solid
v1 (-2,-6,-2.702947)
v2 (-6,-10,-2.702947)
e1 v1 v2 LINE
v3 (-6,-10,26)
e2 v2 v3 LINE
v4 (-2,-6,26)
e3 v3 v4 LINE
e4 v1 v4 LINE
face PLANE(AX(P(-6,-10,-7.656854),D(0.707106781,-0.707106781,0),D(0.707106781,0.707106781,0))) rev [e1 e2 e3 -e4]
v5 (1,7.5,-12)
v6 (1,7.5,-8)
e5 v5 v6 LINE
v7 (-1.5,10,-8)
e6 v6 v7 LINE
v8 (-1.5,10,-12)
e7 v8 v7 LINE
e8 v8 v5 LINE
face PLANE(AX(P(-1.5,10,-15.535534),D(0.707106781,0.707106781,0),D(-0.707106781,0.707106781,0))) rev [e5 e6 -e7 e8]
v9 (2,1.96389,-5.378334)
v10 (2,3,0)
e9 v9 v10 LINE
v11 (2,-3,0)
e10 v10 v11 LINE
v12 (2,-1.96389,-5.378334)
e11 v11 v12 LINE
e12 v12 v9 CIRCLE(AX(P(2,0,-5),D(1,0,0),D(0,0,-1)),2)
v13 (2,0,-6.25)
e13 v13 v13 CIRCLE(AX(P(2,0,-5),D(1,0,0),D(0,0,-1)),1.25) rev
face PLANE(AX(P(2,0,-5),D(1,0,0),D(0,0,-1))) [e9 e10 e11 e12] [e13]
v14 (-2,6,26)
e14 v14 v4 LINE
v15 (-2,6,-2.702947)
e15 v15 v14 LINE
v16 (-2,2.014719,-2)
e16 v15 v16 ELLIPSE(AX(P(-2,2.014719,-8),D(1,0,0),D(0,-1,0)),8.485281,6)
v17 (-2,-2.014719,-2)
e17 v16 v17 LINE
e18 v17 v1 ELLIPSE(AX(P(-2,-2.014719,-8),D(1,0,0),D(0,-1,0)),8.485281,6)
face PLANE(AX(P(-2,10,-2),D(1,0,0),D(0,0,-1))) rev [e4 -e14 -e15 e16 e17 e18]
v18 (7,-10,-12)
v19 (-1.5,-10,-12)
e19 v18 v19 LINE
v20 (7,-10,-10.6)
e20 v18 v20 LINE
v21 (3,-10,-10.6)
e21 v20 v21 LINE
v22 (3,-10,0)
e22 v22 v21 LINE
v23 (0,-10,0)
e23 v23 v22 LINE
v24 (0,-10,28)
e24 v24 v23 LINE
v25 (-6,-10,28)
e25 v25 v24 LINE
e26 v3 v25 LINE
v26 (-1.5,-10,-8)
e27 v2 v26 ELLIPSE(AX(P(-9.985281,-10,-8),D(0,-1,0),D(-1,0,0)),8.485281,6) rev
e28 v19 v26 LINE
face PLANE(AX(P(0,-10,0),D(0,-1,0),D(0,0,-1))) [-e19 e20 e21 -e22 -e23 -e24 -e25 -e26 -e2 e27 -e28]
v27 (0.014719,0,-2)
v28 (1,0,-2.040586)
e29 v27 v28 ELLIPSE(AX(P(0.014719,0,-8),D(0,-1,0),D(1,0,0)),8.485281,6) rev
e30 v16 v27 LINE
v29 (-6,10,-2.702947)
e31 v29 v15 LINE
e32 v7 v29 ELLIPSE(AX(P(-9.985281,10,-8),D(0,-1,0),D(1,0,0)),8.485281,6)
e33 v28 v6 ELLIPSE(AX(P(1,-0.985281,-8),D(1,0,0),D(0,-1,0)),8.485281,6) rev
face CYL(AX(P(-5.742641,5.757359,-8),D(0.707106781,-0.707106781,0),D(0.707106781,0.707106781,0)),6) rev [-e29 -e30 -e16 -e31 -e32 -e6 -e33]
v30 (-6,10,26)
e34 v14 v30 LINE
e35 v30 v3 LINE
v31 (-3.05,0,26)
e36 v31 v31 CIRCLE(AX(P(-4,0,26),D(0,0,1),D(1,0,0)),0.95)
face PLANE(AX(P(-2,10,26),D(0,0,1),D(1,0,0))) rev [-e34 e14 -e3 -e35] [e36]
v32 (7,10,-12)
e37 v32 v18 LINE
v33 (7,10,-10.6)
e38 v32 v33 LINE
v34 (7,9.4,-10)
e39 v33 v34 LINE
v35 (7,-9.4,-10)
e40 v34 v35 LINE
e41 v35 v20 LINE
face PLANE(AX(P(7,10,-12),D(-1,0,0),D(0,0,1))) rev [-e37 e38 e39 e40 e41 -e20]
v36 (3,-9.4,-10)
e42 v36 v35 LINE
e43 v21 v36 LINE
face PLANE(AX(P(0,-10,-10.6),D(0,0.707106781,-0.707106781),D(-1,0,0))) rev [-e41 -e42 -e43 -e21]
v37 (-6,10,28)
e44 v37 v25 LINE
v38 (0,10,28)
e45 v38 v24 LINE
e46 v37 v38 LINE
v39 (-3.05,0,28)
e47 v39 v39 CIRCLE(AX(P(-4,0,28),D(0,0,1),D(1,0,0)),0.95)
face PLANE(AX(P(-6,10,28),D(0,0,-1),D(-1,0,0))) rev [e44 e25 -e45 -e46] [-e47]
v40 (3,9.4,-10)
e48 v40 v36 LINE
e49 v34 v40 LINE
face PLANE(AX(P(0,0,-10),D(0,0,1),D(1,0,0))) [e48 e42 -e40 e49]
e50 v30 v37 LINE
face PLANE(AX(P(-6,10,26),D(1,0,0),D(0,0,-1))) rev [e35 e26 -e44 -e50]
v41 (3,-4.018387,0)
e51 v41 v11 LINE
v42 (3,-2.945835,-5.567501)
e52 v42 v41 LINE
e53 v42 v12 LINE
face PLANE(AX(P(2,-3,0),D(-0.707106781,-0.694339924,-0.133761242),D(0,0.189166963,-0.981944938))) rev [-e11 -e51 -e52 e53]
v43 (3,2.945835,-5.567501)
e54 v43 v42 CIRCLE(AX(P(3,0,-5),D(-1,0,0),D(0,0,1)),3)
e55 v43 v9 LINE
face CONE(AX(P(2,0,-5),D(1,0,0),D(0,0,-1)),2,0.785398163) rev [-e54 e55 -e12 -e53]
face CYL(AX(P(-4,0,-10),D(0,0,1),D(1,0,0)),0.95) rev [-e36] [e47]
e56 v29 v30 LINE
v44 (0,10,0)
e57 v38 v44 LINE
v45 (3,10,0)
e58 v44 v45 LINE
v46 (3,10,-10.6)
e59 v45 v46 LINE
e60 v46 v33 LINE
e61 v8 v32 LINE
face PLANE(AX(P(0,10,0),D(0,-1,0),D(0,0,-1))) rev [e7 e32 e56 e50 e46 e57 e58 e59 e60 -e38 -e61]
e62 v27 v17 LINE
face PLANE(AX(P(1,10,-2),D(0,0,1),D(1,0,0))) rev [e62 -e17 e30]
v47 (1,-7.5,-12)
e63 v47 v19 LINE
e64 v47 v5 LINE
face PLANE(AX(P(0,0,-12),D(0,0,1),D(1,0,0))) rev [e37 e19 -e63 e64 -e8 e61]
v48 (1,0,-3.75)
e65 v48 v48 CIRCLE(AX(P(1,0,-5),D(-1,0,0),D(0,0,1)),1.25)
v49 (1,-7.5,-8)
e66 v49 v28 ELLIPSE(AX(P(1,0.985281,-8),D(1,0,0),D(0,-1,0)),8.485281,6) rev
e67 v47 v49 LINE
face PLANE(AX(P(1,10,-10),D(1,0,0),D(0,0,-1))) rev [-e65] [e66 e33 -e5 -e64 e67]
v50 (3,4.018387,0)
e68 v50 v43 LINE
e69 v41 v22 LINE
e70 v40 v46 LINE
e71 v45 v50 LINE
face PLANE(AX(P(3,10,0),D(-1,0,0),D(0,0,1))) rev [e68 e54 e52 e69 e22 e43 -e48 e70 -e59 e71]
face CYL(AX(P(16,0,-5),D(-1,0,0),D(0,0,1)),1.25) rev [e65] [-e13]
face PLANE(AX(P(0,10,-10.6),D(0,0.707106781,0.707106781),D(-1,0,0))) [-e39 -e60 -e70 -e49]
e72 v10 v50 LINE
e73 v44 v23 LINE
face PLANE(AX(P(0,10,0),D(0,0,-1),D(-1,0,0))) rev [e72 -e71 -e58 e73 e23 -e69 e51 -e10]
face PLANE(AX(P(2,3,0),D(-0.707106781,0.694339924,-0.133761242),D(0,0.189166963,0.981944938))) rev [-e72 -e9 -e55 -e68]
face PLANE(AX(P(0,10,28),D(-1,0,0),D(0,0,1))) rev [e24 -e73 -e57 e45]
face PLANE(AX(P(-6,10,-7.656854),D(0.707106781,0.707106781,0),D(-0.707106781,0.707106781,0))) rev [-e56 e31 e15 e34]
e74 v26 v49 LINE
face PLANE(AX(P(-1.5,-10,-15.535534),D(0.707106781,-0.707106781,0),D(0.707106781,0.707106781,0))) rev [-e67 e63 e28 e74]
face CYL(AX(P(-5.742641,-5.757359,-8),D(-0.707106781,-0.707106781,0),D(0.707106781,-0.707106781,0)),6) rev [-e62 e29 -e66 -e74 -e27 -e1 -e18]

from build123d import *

# Parameters (mm, degrees)
EXTRUDE_1_DEPTH     = 10
SKETCH_2_R          = 1.25
CUT_EXTRUDE_1_DEPTH = 15
SKETCH_4_R          = 0.95
CUT_EXTRUDE_2_DEPTH = 40.749213829
EXTRUDE_2_DEPTH     = 28
SKETCH_7_W          = 6
SKETCH_7_H          = 20
EXTRUDE_4_DEPTH     = 2
CHAMFER_1_SIZE      = 0.6
EXTRUDE_5_DEPTH     = 10
FILLET_2_R          = 6
CUT_EXTRUDE_3_DEPTH = 1
CHAMFER_2_SIZE      = 1


# Some blends are built 0.0001 mm under size
with BuildPart() as part:
    # 草图1 → 凸台-拉伸1 (new, symmetric)
    with BuildSketch(Plane(origin=(0, 0, 0), x_dir=(1, 0, 0), z_dir=(0, 1, 0))):
        Polygon((0, 0), (3, 0), (3, 10), (1, 10), (1, 2), (-2, 2), (-2, -26), (-6, -26), (-6, -28), (0, -28), align=None)
    extrude(amount=EXTRUDE_1_DEPTH, both=True)

    # 草图2 → 切除-拉伸1 (cut)
    with BuildSketch(Plane.ZY.offset(-1)):
        with Locations((-5, 0)):
            Circle(SKETCH_2_R)
    extrude(amount=-CUT_EXTRUDE_1_DEPTH, mode=Mode.SUBTRACT)

    # 草图4 → 切除-拉伸2 (cut, through all)
    with BuildSketch(Plane.XY.offset(28)):
        with Locations((-4, 0)):
            Circle(SKETCH_4_R)
    extrude(amount=-CUT_EXTRUDE_2_DEPTH, mode=Mode.SUBTRACT)

    # 草图5 → 凸台-拉伸2 (add)
    with BuildSketch(Plane(origin=(0, 0, 26), x_dir=(-1, 0, 0), z_dir=(0, 0, -1))):
        Polygon((2, 10), (6, 10), (2, 6), align=None)
        Polygon((2, -6), (2, -10), (6, -10), align=None)
    extrude(amount=EXTRUDE_2_DEPTH)

    # 草图7 → 凸台-拉伸4 (add)
    with BuildSketch(Plane(origin=(0, 0, -10), x_dir=(-1, 0, 0), z_dir=(0, 0, -1))):
        with Locations((-4, 0)):
            Rectangle(SKETCH_7_W, SKETCH_7_H)
    extrude(amount=EXTRUDE_4_DEPTH)

    # 倒角1
    chamfer_1_edges = [part.edges().sort_by_distance(p)[0] for p in [
        (5, 10, -10),
        (5, -10, -10),
    ]]
    chamfer(chamfer_1_edges, length=CHAMFER_1_SIZE)

    # 草图8 → 凸台-拉伸5 (add)
    with BuildSketch(Plane(origin=(0, 0, -2), x_dir=(-1, 0, 0), z_dir=(0, 0, -1))):
        Polygon((-1, 10), (1.5, 10), (-1, 7.5), align=None)
        Polygon((-1, -7.5), (-1, -10), (1.5, -10), align=None)
    extrude(amount=EXTRUDE_5_DEPTH)

    # 圆角2
    # the kernel refuses this fillet: 6 mm, written as the material it adds along each edge
    with BuildSketch(Plane(origin=(-12.106601718, -20.606601718, -2), x_dir=(-0.7071067811865437, 0.7071067811865513, 0), z_dir=(0.7071067811865513, 0.7071067811865438, 0))) as fillet_2_piece_1_section:
        with BuildLine():
            CenterArc((FILLET_2_R, -FILLET_2_R), FILLET_2_R, 90, 90)
            Line((0, -FILLET_2_R), (0, 0))
            Line((0, 0), (FILLET_2_R, 0))
        make_face()
    fillet_2_piece_1 = extrude(amount=33.535533906, mode=Mode.PRIVATE)
    fillet_2_piece_1 = split(fillet_2_piece_1, bisect_by=Plane(origin=(-2, -8.855149606, -2.774001208), z_dir=(-1, 0, 0)), keep=Keep.TOP, mode=Mode.PRIVATE)
    fillet_2_piece_1 = split(fillet_2_piece_1, bisect_by=Plane(origin=(-4, -8, -2.774001208), z_dir=(0.7071067811865515, -0.7071067811865436, 0)), keep=Keep.TOP, mode=Mode.PRIVATE)
    fillet_2_piece_1 = split(fillet_2_piece_1, bisect_by=Plane(origin=(-3.144850394, -10, -2.774001208), z_dir=(0, 1, 0)), keep=Keep.TOP, mode=Mode.PRIVATE)
    add(fillet_2_piece_1)
    with BuildSketch(Plane(origin=(-12.106601718, -20.606601718, -2), x_dir=(-0.7071067811865437, 0.7071067811865513, 0), z_dir=(0.7071067811865513, 0.7071067811865438, 0))) as fillet_2_piece_2_section:
        with BuildLine():
            CenterArc((FILLET_2_R, -FILLET_2_R), FILLET_2_R, 90, 90)
            Line((0, -FILLET_2_R), (0, 0))
            Line((0, 0), (FILLET_2_R, 0))
        make_face()
    fillet_2_piece_2 = extrude(amount=33.535533906, mode=Mode.PRIVATE)
    fillet_2_piece_2 = split(fillet_2_piece_2, bisect_by=Plane(origin=(1, -3.168547951, -2.116110368), z_dir=(-1, 0, 0)), keep=Keep.TOP, mode=Mode.PRIVATE)
    fillet_2_piece_2 = split(fillet_2_piece_2, bisect_by=Plane(origin=(-2, -3.168547951, -2.116110368), z_dir=(1, 0, 0)), keep=Keep.TOP, mode=Mode.PRIVATE)
    fillet_2_piece_2 = split(fillet_2_piece_2, bisect_by=Plane(origin=(0.165726024, -3.834273976, -2.116110368), z_dir=(-0.7071067811865515, 0.7071067811865436, 0)), keep=Keep.TOP, mode=Mode.PRIVATE)
    add(fillet_2_piece_2)
    with BuildSketch(Plane(origin=(-12.106601718, -20.606601718, -2), x_dir=(-0.7071067811865437, 0.7071067811865513, 0), z_dir=(0.7071067811865513, 0.7071067811865438, 0))) as fillet_2_piece_3_section:
        with BuildLine():
            CenterArc((FILLET_2_R, -FILLET_2_R), FILLET_2_R, 90, 90)
            Line((0, -FILLET_2_R), (0, 0))
            Line((0, 0), (FILLET_2_R, 0))
        make_face()
    fillet_2_piece_3 = extrude(amount=33.535533906, mode=Mode.PRIVATE)
    fillet_2_piece_3 = split(fillet_2_piece_3, bisect_by=Plane(origin=(1, -7.448559775, -3.464262476), z_dir=(-1, 0, 0)), keep=Keep.TOP, mode=Mode.PRIVATE)
    fillet_2_piece_3 = split(fillet_2_piece_3, bisect_by=Plane(origin=(-2, -7.448559775, -3.464262476), z_dir=(1, 0, 0)), keep=Keep.TOP, mode=Mode.PRIVATE)
    fillet_2_piece_3 = split(fillet_2_piece_3, bisect_by=Plane(origin=(-1.950921276, -5.950921276, -3.464262476), z_dir=(0.7071067811865515, -0.7071067811865436, 0)), keep=Keep.TOP, mode=Mode.PRIVATE)
    fillet_2_piece_3 = split(fillet_2_piece_3, bisect_by=Plane(origin=(-0.453282777, -10, -3.464262476), z_dir=(0, 1, 0)), keep=Keep.TOP, mode=Mode.PRIVATE)
    add(fillet_2_piece_3)
    with BuildSketch(Plane(origin=(-12.106601718, 20.606601718, -2), x_dir=(-0.707106781186544, -0.7071067811865511, 0), z_dir=(0.7071067811865511, -0.7071067811865439, 0))) as fillet_2_piece_4_section:
        with BuildLine():
            CenterArc((FILLET_2_R, FILLET_2_R), FILLET_2_R, 180, 90)
            Line((0, FILLET_2_R), (0, 0))
            Line((0, 0), (FILLET_2_R, 0))
        make_face()
    fillet_2_piece_4 = extrude(amount=33.535533906, mode=Mode.PRIVATE)
    fillet_2_piece_4 = split(fillet_2_piece_4, bisect_by=Plane(origin=(-3.144850394, 10, -2.774001208), z_dir=(0, -1, 0)), keep=Keep.TOP, mode=Mode.PRIVATE)
    fillet_2_piece_4 = split(fillet_2_piece_4, bisect_by=Plane(origin=(-4, 8, -2.774001208), z_dir=(0.7071067811865515, 0.7071067811865436, 0)), keep=Keep.TOP, mode=Mode.PRIVATE)
    fillet_2_piece_4 = split(fillet_2_piece_4, bisect_by=Plane(origin=(-2, 8.855149606, -2.774001208), z_dir=(-1, 0, 0)), keep=Keep.TOP, mode=Mode.PRIVATE)
    add(fillet_2_piece_4)
    with BuildSketch(Plane(origin=(-12.106601718, 20.606601718, -2), x_dir=(-0.707106781186544, -0.7071067811865511, 0), z_dir=(0.7071067811865511, -0.7071067811865439, 0))) as fillet_2_piece_5_section:
        with BuildLine():
            CenterArc((FILLET_2_R, FILLET_2_R), FILLET_2_R, 180, 90)
            Line((0, FILLET_2_R), (0, 0))
            Line((0, 0), (FILLET_2_R, 0))
        make_face()
    fillet_2_piece_5 = extrude(amount=33.535533906, mode=Mode.PRIVATE)
    fillet_2_piece_5 = split(fillet_2_piece_5, bisect_by=Plane(origin=(1, 3.168547951, -2.116110368), z_dir=(-1, 0, 0)), keep=Keep.TOP, mode=Mode.PRIVATE)
    fillet_2_piece_5 = split(fillet_2_piece_5, bisect_by=Plane(origin=(0.165726024, 3.834273976, -2.116110368), z_dir=(-0.7071067811865515, -0.7071067811865436, 0)), keep=Keep.TOP, mode=Mode.PRIVATE)
    fillet_2_piece_5 = split(fillet_2_piece_5, bisect_by=Plane(origin=(-2, 3.168547951, -2.116110368), z_dir=(1, 0, 0)), keep=Keep.TOP, mode=Mode.PRIVATE)
    add(fillet_2_piece_5)
    with BuildSketch(Plane(origin=(-12.106601718, 20.606601718, -2), x_dir=(-0.707106781186544, -0.7071067811865511, 0), z_dir=(0.7071067811865511, -0.7071067811865439, 0))) as fillet_2_piece_6_section:
        with BuildLine():
            CenterArc((FILLET_2_R, FILLET_2_R), FILLET_2_R, 180, 90)
            Line((0, FILLET_2_R), (0, 0))
            Line((0, 0), (FILLET_2_R, 0))
        make_face()
    fillet_2_piece_6 = extrude(amount=33.535533906, mode=Mode.PRIVATE)
    fillet_2_piece_6 = split(fillet_2_piece_6, bisect_by=Plane(origin=(1, 7.448559775, -3.464262476), z_dir=(-1, 0, 0)), keep=Keep.TOP, mode=Mode.PRIVATE)
    fillet_2_piece_6 = split(fillet_2_piece_6, bisect_by=Plane(origin=(-0.453282777, 10, -3.464262476), z_dir=(0, -1, 0)), keep=Keep.TOP, mode=Mode.PRIVATE)
    fillet_2_piece_6 = split(fillet_2_piece_6, bisect_by=Plane(origin=(-1.950921276, 5.950921276, -3.464262476), z_dir=(0.7071067811865515, 0.7071067811865436, 0)), keep=Keep.TOP, mode=Mode.PRIVATE)
    fillet_2_piece_6 = split(fillet_2_piece_6, bisect_by=Plane(origin=(-2, 7.448559775, -3.464262476), z_dir=(1, 0, 0)), keep=Keep.TOP, mode=Mode.PRIVATE)
    add(fillet_2_piece_6)

    # 草图9 → 切除-拉伸3 (cut)
    with BuildSketch(Plane(origin=(3, 0, 0), x_dir=(0, 0, -1), z_dir=(1, 0, 0))):
        with BuildLine():
            Line((0, -3), (0, 3))
            Line((0, 3), (5.378333925, 1.963889875))
            ThreePointArc((5.378333925, 1.963889875), (7, 0), (5.378333925, -1.963889875))
            Line((5.378333925, -1.963889875), (0, -3))
        make_face()
    extrude(amount=-CUT_EXTRUDE_3_DEPTH, mode=Mode.SUBTRACT)

    # 倒角2
    chamfer_2_edges = [part.edges().sort_by_distance(p)[0] for p in [
        (3, -2.481944938, -2.689166963),
        (3, 0, -7),
        (3, 2.481944938, -2.689166963),
    ]]
    chamfer(chamfer_2_edges, length=CHAMFER_2_SIZE - 0.0001)  # a hair under: the kernel refuses the full size


solid = part.part
